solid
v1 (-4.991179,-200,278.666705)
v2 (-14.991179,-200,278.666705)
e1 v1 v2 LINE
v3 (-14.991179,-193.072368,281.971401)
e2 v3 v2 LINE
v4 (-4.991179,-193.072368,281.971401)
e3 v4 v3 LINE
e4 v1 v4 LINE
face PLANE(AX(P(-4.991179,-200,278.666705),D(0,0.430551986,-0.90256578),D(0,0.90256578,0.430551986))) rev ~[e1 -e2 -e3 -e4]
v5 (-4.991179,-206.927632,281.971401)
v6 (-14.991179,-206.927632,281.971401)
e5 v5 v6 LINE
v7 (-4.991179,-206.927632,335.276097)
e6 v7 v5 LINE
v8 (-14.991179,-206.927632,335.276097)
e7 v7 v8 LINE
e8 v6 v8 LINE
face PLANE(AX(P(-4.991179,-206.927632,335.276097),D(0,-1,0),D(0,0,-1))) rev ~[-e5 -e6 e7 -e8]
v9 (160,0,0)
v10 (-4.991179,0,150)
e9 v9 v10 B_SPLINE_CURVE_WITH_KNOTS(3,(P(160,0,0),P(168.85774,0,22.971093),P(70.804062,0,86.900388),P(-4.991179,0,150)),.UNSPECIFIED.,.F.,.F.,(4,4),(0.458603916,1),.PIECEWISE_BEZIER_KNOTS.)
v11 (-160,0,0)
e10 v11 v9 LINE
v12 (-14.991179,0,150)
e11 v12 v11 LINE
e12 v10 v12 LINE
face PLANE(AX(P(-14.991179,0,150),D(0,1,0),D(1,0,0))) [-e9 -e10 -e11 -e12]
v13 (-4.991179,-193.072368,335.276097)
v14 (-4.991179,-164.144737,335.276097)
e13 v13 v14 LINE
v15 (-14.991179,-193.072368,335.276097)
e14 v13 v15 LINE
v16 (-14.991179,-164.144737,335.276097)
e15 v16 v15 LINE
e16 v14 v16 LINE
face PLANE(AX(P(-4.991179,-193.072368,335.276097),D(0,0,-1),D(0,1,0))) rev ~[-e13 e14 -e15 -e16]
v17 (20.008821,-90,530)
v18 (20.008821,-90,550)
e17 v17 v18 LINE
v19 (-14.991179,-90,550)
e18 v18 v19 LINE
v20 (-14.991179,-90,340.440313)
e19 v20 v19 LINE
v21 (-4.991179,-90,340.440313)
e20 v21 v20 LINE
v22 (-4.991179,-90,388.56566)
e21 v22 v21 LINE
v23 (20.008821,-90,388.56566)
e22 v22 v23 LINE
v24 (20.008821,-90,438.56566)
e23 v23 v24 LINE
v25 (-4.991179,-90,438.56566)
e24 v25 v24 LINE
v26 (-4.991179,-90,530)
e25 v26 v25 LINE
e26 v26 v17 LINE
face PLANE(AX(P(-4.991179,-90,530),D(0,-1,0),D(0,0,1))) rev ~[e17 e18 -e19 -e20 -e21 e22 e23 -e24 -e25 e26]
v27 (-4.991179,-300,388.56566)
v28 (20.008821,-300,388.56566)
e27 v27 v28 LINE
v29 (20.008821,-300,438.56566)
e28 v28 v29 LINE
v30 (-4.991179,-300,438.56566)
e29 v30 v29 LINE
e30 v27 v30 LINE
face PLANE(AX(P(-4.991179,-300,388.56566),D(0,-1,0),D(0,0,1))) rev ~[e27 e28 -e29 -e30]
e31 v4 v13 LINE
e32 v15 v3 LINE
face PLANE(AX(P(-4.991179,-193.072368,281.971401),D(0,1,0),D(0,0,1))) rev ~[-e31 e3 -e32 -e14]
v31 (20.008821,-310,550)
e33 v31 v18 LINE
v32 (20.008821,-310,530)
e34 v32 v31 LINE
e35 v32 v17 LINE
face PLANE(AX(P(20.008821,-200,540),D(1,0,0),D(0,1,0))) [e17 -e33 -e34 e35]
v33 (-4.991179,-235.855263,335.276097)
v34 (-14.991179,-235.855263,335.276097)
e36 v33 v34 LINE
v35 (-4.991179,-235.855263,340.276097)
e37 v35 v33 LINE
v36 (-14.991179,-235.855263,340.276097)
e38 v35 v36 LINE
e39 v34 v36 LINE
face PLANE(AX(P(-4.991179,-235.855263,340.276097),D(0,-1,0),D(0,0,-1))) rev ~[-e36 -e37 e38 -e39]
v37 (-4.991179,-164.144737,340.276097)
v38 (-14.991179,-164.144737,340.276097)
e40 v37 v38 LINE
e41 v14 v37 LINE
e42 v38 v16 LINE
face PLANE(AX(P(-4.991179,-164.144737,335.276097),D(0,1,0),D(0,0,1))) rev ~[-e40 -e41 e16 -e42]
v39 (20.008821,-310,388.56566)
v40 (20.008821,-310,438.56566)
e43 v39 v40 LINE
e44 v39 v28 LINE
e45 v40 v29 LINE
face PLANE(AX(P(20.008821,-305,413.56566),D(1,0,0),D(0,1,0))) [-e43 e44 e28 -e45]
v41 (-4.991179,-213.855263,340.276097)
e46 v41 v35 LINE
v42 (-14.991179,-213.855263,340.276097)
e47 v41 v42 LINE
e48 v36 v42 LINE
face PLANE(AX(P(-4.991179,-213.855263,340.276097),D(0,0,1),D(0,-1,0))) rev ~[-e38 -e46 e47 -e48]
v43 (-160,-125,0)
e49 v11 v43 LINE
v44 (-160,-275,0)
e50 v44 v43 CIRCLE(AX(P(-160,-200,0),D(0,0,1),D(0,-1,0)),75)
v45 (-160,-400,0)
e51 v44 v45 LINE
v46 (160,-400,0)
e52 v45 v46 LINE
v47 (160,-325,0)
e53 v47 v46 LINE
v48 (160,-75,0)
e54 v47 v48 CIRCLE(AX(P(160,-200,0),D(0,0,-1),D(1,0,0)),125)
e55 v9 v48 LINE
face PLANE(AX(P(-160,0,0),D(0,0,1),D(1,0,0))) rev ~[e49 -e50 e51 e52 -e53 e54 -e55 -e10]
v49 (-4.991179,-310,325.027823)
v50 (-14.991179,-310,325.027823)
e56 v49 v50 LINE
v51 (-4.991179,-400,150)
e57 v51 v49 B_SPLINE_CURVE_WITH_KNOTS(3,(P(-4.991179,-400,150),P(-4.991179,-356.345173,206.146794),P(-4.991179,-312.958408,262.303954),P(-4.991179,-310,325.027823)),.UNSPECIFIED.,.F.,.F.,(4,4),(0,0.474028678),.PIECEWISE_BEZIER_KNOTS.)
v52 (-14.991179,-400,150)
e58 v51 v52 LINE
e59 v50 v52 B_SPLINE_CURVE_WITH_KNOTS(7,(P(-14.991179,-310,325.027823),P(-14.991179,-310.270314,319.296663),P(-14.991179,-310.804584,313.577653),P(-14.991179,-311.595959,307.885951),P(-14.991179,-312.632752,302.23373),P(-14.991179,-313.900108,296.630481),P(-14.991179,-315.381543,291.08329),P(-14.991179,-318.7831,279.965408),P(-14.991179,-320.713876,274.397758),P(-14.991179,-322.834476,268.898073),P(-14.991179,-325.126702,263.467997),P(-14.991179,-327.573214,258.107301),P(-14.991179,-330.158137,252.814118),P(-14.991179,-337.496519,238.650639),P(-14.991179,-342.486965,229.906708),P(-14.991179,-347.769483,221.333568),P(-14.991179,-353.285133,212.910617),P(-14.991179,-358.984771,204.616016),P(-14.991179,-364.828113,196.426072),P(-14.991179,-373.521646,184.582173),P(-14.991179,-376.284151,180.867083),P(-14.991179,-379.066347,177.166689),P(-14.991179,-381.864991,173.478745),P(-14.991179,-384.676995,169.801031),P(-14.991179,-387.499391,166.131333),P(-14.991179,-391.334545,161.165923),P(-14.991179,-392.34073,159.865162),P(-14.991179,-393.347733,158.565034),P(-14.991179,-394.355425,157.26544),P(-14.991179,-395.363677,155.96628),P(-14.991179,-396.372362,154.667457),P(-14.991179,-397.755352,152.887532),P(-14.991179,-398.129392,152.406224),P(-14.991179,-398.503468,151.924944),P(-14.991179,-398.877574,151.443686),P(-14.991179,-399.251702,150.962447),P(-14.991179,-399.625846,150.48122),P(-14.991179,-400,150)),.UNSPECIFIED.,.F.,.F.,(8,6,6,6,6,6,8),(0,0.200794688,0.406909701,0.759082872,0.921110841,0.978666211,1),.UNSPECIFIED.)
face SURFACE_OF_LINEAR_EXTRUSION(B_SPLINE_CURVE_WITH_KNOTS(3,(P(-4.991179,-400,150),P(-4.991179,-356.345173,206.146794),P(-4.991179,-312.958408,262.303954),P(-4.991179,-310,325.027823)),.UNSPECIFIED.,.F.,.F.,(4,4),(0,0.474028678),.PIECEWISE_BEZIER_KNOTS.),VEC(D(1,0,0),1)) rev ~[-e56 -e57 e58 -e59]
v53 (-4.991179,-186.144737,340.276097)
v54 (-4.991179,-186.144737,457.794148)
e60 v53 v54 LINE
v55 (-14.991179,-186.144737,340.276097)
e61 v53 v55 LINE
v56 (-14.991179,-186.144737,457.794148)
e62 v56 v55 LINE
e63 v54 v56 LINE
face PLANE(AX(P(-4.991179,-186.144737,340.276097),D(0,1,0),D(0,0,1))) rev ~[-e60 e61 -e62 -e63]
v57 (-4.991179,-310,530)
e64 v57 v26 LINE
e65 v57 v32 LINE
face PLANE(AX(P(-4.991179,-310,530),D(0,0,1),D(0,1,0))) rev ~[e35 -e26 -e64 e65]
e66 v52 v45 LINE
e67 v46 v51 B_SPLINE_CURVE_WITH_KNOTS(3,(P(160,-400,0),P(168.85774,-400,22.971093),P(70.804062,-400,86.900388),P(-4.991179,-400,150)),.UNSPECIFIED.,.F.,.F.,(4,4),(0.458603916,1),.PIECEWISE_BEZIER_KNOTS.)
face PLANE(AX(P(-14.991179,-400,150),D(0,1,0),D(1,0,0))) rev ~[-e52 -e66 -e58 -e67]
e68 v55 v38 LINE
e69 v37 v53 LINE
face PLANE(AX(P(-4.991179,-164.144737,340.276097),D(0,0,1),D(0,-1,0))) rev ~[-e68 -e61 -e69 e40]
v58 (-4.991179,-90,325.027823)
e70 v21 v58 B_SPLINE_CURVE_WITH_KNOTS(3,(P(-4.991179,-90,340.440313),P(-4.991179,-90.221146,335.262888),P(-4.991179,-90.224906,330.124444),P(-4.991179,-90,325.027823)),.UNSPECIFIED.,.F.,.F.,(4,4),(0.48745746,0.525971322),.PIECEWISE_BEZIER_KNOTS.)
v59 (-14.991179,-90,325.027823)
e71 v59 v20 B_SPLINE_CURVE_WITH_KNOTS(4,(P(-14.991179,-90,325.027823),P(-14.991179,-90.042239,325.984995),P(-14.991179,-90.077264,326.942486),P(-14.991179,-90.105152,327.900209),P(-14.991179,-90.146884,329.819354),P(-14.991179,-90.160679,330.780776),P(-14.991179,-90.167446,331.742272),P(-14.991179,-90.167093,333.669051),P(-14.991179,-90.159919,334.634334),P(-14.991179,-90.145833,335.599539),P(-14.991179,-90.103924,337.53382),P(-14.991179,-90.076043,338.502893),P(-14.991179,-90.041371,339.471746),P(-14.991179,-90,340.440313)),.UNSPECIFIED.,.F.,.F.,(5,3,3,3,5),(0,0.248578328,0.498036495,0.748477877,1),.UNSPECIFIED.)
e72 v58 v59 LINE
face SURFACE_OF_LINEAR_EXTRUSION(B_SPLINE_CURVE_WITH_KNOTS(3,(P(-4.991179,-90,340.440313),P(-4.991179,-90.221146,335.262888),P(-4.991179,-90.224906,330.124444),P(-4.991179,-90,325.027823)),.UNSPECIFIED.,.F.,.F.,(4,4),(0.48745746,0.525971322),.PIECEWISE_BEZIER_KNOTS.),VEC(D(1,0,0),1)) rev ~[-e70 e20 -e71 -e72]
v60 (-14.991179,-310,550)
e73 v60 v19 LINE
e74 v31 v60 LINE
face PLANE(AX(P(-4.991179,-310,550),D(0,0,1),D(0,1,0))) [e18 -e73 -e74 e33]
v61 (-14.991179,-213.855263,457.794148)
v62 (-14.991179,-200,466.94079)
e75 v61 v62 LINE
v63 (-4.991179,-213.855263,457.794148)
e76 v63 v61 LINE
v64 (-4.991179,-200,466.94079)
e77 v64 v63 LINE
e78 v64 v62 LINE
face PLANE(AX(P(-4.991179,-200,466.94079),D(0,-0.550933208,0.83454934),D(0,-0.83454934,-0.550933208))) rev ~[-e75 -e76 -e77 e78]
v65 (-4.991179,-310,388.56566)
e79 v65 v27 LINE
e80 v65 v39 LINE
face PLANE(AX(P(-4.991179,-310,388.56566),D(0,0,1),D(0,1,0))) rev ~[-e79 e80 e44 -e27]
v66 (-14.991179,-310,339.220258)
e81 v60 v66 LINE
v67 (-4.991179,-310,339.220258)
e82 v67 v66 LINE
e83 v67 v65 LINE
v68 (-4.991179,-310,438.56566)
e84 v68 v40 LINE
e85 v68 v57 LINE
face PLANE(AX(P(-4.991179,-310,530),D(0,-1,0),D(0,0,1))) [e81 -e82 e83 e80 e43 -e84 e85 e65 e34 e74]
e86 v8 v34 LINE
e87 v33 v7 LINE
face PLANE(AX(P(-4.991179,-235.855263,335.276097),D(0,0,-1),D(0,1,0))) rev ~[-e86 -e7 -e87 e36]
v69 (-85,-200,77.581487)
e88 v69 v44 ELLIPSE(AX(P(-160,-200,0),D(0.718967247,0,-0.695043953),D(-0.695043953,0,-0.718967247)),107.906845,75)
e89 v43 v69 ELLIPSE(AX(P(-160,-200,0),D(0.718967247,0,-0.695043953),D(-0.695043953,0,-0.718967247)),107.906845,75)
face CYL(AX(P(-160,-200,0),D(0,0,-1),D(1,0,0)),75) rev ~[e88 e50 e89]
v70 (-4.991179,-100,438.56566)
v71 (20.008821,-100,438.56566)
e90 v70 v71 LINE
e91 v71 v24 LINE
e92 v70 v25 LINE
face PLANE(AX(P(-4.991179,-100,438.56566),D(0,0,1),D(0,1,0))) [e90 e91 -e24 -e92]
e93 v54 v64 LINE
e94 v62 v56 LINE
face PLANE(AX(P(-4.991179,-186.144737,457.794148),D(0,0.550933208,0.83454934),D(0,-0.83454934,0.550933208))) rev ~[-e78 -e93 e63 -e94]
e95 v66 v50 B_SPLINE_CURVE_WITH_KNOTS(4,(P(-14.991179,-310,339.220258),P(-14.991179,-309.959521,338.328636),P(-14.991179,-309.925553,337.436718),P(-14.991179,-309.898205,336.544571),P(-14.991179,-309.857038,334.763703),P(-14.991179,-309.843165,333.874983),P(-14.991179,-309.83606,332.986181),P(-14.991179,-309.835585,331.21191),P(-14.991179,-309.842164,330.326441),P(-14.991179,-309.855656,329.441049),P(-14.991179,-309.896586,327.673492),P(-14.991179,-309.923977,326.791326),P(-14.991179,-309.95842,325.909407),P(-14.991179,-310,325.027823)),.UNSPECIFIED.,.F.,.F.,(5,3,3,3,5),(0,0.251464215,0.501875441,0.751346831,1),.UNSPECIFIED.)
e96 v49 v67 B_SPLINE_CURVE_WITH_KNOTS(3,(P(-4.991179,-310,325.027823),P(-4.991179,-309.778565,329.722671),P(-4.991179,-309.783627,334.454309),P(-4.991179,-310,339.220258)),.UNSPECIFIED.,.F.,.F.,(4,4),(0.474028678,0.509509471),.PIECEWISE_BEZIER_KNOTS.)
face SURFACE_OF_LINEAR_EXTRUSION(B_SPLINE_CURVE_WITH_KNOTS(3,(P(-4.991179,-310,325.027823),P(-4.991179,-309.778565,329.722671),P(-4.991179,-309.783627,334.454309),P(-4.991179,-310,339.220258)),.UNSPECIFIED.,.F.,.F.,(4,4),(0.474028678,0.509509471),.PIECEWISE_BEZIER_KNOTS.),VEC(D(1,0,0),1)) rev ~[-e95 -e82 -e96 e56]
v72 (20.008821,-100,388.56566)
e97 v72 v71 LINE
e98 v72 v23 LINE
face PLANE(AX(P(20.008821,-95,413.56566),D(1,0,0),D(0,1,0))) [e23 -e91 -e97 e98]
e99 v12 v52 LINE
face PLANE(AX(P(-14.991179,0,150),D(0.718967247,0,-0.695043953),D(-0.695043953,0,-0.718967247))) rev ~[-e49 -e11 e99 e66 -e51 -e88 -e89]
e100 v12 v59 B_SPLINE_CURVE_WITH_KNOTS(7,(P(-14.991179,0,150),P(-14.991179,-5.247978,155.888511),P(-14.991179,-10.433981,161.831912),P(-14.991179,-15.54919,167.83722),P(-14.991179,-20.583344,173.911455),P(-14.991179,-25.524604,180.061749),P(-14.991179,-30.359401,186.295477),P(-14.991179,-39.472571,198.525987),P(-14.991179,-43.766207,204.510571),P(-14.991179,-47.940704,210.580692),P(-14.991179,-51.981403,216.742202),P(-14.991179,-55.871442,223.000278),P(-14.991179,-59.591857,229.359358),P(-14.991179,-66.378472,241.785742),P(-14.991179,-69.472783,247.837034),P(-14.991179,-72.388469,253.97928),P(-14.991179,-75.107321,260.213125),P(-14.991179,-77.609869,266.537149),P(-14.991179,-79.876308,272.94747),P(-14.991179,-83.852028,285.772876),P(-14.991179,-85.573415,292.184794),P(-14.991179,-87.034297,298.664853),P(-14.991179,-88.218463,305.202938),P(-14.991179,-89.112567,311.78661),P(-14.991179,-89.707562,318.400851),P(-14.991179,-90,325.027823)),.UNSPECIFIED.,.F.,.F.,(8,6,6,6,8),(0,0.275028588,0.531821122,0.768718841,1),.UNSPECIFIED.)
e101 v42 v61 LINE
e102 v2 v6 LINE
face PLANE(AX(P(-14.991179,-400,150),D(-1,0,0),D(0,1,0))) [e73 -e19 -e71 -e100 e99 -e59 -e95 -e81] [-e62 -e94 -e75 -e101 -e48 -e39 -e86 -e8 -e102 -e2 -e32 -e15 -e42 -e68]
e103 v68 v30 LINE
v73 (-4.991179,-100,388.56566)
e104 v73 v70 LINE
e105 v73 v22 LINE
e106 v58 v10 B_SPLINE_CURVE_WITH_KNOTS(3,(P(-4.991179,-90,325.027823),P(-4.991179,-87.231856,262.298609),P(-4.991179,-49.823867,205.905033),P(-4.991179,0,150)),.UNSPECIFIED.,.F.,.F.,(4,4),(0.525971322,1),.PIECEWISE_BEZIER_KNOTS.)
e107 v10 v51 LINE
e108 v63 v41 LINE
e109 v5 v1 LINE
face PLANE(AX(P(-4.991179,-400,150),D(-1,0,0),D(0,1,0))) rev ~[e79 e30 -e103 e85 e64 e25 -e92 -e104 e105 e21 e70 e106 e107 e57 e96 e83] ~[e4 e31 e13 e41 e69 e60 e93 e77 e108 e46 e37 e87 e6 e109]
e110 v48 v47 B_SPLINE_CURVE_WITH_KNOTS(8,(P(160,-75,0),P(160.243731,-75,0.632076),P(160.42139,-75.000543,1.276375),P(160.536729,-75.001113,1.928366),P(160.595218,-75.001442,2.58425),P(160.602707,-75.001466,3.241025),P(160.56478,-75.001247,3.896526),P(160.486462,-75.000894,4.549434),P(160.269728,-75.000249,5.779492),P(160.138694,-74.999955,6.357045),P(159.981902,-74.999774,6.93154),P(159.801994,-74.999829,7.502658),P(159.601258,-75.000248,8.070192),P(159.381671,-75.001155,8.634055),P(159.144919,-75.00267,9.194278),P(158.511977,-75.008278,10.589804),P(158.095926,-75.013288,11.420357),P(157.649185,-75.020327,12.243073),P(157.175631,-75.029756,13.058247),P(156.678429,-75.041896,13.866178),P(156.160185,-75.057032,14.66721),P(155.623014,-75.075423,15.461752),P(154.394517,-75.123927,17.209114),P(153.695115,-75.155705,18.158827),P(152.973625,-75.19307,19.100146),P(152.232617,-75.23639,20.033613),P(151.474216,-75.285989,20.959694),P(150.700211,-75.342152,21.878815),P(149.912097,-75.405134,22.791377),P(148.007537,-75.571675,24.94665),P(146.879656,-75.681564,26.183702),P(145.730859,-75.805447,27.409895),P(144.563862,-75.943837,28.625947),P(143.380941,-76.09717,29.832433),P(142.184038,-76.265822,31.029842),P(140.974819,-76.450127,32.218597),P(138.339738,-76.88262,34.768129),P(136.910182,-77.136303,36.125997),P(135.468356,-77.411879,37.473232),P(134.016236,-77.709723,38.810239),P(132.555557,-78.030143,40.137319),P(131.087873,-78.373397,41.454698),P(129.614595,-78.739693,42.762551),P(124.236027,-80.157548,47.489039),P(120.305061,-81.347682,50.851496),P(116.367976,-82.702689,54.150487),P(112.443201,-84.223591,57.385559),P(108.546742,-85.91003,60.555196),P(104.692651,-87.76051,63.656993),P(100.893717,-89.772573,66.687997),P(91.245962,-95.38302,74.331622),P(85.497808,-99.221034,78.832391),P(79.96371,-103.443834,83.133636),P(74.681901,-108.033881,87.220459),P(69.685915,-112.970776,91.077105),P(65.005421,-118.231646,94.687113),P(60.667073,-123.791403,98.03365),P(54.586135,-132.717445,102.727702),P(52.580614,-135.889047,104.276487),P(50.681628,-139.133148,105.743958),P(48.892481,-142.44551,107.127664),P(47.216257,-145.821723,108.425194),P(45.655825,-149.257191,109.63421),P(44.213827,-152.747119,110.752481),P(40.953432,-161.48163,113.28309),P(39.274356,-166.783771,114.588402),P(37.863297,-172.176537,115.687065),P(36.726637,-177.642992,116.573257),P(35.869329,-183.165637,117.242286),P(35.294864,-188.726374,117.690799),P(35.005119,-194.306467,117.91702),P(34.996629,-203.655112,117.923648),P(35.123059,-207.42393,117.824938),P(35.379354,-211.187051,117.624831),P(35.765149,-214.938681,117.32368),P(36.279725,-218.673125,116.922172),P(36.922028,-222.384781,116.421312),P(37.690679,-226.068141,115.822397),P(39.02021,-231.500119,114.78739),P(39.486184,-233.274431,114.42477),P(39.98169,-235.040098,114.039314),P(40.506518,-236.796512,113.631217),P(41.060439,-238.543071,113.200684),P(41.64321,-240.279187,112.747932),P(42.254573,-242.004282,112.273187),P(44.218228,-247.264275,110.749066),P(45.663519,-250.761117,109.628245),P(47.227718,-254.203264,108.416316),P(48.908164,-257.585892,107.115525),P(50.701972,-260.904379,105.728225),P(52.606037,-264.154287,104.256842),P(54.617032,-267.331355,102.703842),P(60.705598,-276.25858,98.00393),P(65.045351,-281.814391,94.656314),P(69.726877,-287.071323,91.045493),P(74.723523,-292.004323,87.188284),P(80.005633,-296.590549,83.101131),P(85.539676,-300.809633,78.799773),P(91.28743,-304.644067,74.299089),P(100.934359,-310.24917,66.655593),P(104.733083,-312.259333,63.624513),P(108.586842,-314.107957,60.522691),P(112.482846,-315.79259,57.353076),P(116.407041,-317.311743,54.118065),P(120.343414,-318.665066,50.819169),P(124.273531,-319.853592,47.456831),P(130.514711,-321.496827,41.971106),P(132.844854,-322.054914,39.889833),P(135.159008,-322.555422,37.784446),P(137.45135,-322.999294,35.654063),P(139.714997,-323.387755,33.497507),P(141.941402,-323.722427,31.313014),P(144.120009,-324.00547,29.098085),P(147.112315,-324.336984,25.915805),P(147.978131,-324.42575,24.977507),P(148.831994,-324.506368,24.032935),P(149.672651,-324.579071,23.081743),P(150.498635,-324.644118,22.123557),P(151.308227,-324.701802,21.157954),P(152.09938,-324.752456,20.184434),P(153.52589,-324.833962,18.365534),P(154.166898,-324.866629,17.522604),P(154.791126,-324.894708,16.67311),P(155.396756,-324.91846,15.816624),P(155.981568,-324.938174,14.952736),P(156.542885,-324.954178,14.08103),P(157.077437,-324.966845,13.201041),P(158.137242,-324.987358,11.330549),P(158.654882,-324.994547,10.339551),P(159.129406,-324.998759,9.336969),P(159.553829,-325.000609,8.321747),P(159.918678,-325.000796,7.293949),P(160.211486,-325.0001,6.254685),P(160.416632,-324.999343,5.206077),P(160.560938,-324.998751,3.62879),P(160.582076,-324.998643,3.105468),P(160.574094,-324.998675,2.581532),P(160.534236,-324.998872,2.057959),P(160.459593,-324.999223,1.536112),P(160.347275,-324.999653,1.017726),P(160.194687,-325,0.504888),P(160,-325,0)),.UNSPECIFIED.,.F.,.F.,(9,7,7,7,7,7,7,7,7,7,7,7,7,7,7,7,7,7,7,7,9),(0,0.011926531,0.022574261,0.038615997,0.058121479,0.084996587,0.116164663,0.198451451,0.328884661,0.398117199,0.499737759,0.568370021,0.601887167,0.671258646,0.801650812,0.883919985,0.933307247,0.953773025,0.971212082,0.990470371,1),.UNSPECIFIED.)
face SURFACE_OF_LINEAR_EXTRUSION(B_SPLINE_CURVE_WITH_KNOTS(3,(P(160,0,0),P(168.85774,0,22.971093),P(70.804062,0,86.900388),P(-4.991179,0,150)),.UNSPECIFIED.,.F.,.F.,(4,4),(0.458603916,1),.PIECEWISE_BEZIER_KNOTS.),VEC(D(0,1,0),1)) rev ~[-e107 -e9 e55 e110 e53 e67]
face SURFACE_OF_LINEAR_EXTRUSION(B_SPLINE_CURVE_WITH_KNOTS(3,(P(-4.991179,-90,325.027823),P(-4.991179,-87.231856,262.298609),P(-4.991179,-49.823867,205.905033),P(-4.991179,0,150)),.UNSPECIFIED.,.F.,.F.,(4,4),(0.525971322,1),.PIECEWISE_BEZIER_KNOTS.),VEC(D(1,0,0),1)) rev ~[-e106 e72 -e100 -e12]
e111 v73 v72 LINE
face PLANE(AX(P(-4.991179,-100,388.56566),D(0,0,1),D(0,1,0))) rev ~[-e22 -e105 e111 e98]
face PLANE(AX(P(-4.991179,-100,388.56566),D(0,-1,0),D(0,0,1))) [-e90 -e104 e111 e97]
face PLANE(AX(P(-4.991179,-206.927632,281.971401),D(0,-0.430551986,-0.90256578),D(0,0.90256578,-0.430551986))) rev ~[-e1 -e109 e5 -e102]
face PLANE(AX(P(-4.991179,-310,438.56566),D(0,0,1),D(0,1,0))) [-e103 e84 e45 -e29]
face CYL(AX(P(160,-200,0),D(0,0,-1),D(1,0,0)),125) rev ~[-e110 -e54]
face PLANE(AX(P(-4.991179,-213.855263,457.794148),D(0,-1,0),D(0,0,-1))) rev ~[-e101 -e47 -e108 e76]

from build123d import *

# Parameters (mm, degrees)
F1_DEPTH  = 400
F2_R      = 75
F2_R_2    = 125
F3_DEPTH  = 160
F4_W      = 10
F4_H      = 400
F5_DEPTH  = 400
F7_DEPTH  = 369
F8_DEPTH  = 744
F9_DEPTH  = 294
F10_DEPTH = 25
F11_W     = 220
F11_H     = 20
F12_DEPTH = 25
F13_W     = 10
F13_H     = 50
F14_DEPTH = 25


with BuildPart() as f1:
    # F0 (on Front) → F1 (new body)
    with BuildSketch(Plane.XZ):
        with BuildLine():
            Line((-10, 0), (0, 0))
            Line((0, 0), (160, 0))
            add(Edge.make_bspline(
                [(160, 0), (168.8577404315, 22.9710926099), (70.8040622396, 86.9003880522), (-4.9911788106, 150)],
                knots=[0.4586039165, 0.4586039165, 0.4586039165, 0.4586039165, 1, 1, 1, 1], degree=3))
            Line((-4.9911788106, 150), (-14.9911788106, 150))
            Line((-14.9911788106, 150), (-160, 0))
            Line((-160, 0), (-60, 0))
            Line((-60, 0), (-10, 0))
        make_face()
    extrude(amount=F1_DEPTH)

    # F2 (on face) → F3 (cut)
    with BuildSketch(Plane(origin=(0, 0, 0), x_dir=(1, 0, 0), z_dir=(0, 0, -1))):
        with Locations((-160, 200)):
            Circle(F2_R)
        with Locations((160, 200)):
            Circle(F2_R_2)
    extrude(amount=-F3_DEPTH, mode=Mode.SUBTRACT)

    # F4 (on face) → F5 (join)
    with BuildSketch(Plane.XY.offset(150)):
        with Locations((-9.9911788106, -200)):
            Rectangle(F4_W, F4_H)
    extrude(amount=F5_DEPTH)

    # F6 (on face) → F7 (cut)
    with BuildSketch(Plane.YZ.offset(-4.9911788106)):
        with BuildLine():
            Line((-400, 550), (-400, 150))
            add(Edge.make_bspline(
                [(-400, 150), (-356.3451728041, 206.1467944777), (-312.9584078924, 262.3039541318), (-310, 325.0278234482)],
                knots=[0, 0, 0, 0, 0.4740286783, 0.4740286783, 0.4740286783, 0.4740286783], degree=3))
            Line((-310, 325.0278234482), (-310, 339.2202581751))
            add(Edge.make_bspline(
                [(-310, 339.2202581751), (-312.9911644459, 405.1052836748), (-356.3650932552, 477.5474537124), (-400, 550)],
                knots=[0.5095094707, 0.5095094707, 0.5095094707, 0.5095094707, 1, 1, 1, 1], degree=3))
        make_face()
        with BuildLine():
            Line((0, 550), (-90, 550))
            Line((-90, 550), (-90, 530))
            Line((-90, 530), (-90, 340.4403127563))
            add(Edge.make_bspline(
                [(0, 550), (-49.5785227153, 477.7428221558), (-87.2010209493, 405.969304948), (-90, 340.4403127563)],
                knots=[0, 0, 0, 0, 0.4874574601, 0.4874574601, 0.4874574601, 0.4874574601], degree=3))
        make_face()
        with BuildLine():
            Line((-310, 339.2202581751), (-310, 325.0278234482))
            add(Edge.make_bspline(
                [(-310, 325.0278234482), (-309.7785647553, 329.7226714383), (-309.7836270458, 334.4543090401), (-310, 339.2202581751)],
                knots=[0.4740286783, 0.4740286783, 0.4740286783, 0.4740286783, 0.5095094707, 0.5095094707, 0.5095094707, 0.5095094707], degree=3))
        make_face()
        with BuildLine():
            Line((-310, 550), (-400, 550))
            add(Edge.make_bspline(
                [(-310, 339.2202581751), (-312.9911644459, 405.1052836748), (-356.3650932552, 477.5474537124), (-400, 550)],
                knots=[0.5095094707, 0.5095094707, 0.5095094707, 0.5095094707, 1, 1, 1, 1], degree=3))
            Line((-310, 339.2202581751), (-310, 530))
            Line((-310, 530), (-310, 550))
        make_face()
        with BuildLine():
            Line((0, 150), (0, 550))
            add(Edge.make_bspline(
                [(0, 550), (-49.5785227153, 477.7428221558), (-87.2010209493, 405.969304948), (-90, 340.4403127563)],
                knots=[0, 0, 0, 0, 0.4874574601, 0.4874574601, 0.4874574601, 0.4874574601], degree=3))
            Line((-90, 340.4403127563), (-90, 325.0278234482))
            add(Edge.make_bspline(
                [(-90, 325.0278234482), (-87.2318561535, 262.2986085933), (-49.8238669759, 205.9050330021), (0, 150)],
                knots=[0.5259713217, 0.5259713217, 0.5259713217, 0.5259713217, 1, 1, 1, 1], degree=3))
        make_face()
        with BuildLine():
            Line((-90, 325.0278234482), (-90, 340.4403127563))
            add(Edge.make_bspline(
                [(-90, 340.4403127563), (-90.2211464603, 335.2628875556), (-90.224906032, 330.1244439943), (-90, 325.0278234482)],
                knots=[0.4874574601, 0.4874574601, 0.4874574601, 0.4874574601, 0.5259713217, 0.5259713217, 0.5259713217, 0.5259713217], degree=3))
        make_face()
        Polygon((-186.1447365284, 340.2760970592), (-186.1447365284, 457.7941475637), (-200, 466.9407904148), (-213.8552634716, 457.7941475637), (-213.8552634716, 340.2760970592), (-225.8552634716, 340.2760970592), (-235.8552634716, 340.2760970592), (-235.8552634716, 335.2760970592), (-213.8552634716, 335.2760970592), (-206.9276317358, 335.2760970592), (-206.9276317358, 281.9714009762), (-200, 278.6667048931), (-193.0723682642, 281.9714009762), (-193.0723682642, 335.2760970592), (-186.1447365284, 335.2760970592), (-164.1447365284, 335.2760970592), (-164.1447365284, 340.2760970592), (-174.1447365284, 340.2760970592), align=None)
    extrude(amount=-F7_DEPTH, mode=Mode.SUBTRACT)

    # F6 (on face) → F8 (cut)
    with BuildSketch(Plane.YZ.offset(-4.9911788106)):
        with BuildLine():
            Line((-400, 550), (-400, 150))
            add(Edge.make_bspline(
                [(-400, 150), (-356.3451728041, 206.1467944777), (-312.9584078924, 262.3039541318), (-310, 325.0278234482)],
                knots=[0, 0, 0, 0, 0.4740286783, 0.4740286783, 0.4740286783, 0.4740286783], degree=3))
            Line((-310, 325.0278234482), (-310, 339.2202581751))
            add(Edge.make_bspline(
                [(-310, 339.2202581751), (-312.9911644459, 405.1052836748), (-356.3650932552, 477.5474537124), (-400, 550)],
                knots=[0.5095094707, 0.5095094707, 0.5095094707, 0.5095094707, 1, 1, 1, 1], degree=3))
        make_face()
        with BuildLine():
            Line((0, 550), (-90, 550))
            Line((-90, 550), (-90, 530))
            Line((-90, 530), (-90, 340.4403127563))
            add(Edge.make_bspline(
                [(0, 550), (-49.5785227153, 477.7428221558), (-87.2010209493, 405.969304948), (-90, 340.4403127563)],
                knots=[0, 0, 0, 0, 0.4874574601, 0.4874574601, 0.4874574601, 0.4874574601], degree=3))
        make_face()
        with BuildLine():
            Line((-310, 339.2202581751), (-310, 325.0278234482))
            add(Edge.make_bspline(
                [(-310, 325.0278234482), (-309.7785647553, 329.7226714383), (-309.7836270458, 334.4543090401), (-310, 339.2202581751)],
                knots=[0.4740286783, 0.4740286783, 0.4740286783, 0.4740286783, 0.5095094707, 0.5095094707, 0.5095094707, 0.5095094707], degree=3))
        make_face()
        with BuildLine():
            Line((-310, 550), (-400, 550))
            add(Edge.make_bspline(
                [(-310, 339.2202581751), (-312.9911644459, 405.1052836748), (-356.3650932552, 477.5474537124), (-400, 550)],
                knots=[0.5095094707, 0.5095094707, 0.5095094707, 0.5095094707, 1, 1, 1, 1], degree=3))
            Line((-310, 339.2202581751), (-310, 530))
            Line((-310, 530), (-310, 550))
        make_face()
        with BuildLine():
            Line((0, 150), (0, 550))
            add(Edge.make_bspline(
                [(0, 550), (-49.5785227153, 477.7428221558), (-87.2010209493, 405.969304948), (-90, 340.4403127563)],
                knots=[0, 0, 0, 0, 0.4874574601, 0.4874574601, 0.4874574601, 0.4874574601], degree=3))
            Line((-90, 340.4403127563), (-90, 325.0278234482))
            add(Edge.make_bspline(
                [(-90, 325.0278234482), (-87.2318561535, 262.2986085933), (-49.8238669759, 205.9050330021), (0, 150)],
                knots=[0.5259713217, 0.5259713217, 0.5259713217, 0.5259713217, 1, 1, 1, 1], degree=3))
        make_face()
        with BuildLine():
            Line((-90, 325.0278234482), (-90, 340.4403127563))
            add(Edge.make_bspline(
                [(-90, 340.4403127563), (-90.2211464603, 335.2628875556), (-90.224906032, 330.1244439943), (-90, 325.0278234482)],
                knots=[0.4874574601, 0.4874574601, 0.4874574601, 0.4874574601, 0.5259713217, 0.5259713217, 0.5259713217, 0.5259713217], degree=3))
        make_face()
        Polygon((-186.1447365284, 340.2760970592), (-186.1447365284, 457.7941475637), (-200, 466.9407904148), (-213.8552634716, 457.7941475637), (-213.8552634716, 340.2760970592), (-225.8552634716, 340.2760970592), (-235.8552634716, 340.2760970592), (-235.8552634716, 335.2760970592), (-213.8552634716, 335.2760970592), (-206.9276317358, 335.2760970592), (-206.9276317358, 281.9714009762), (-200, 278.6667048931), (-193.0723682642, 281.9714009762), (-193.0723682642, 335.2760970592), (-186.1447365284, 335.2760970592), (-164.1447365284, 335.2760970592), (-164.1447365284, 340.2760970592), (-174.1447365284, 340.2760970592), align=None)
    extrude(amount=-F8_DEPTH, mode=Mode.SUBTRACT)

    # F6 (on face) → F9 (cut)
    with BuildSketch(Plane.YZ.offset(-4.9911788106)):
        with BuildLine():
            Line((-400, 550), (-400, 150))
            add(Edge.make_bspline(
                [(-400, 150), (-356.3451728041, 206.1467944777), (-312.9584078924, 262.3039541318), (-310, 325.0278234482)],
                knots=[0, 0, 0, 0, 0.4740286783, 0.4740286783, 0.4740286783, 0.4740286783], degree=3))
            Line((-310, 325.0278234482), (-310, 339.2202581751))
            add(Edge.make_bspline(
                [(-310, 339.2202581751), (-312.9911644459, 405.1052836748), (-356.3650932552, 477.5474537124), (-400, 550)],
                knots=[0.5095094707, 0.5095094707, 0.5095094707, 0.5095094707, 1, 1, 1, 1], degree=3))
        make_face()
        with BuildLine():
            Line((0, 550), (-90, 550))
            Line((-90, 550), (-90, 530))
            Line((-90, 530), (-90, 340.4403127563))
            add(Edge.make_bspline(
                [(0, 550), (-49.5785227153, 477.7428221558), (-87.2010209493, 405.969304948), (-90, 340.4403127563)],
                knots=[0, 0, 0, 0, 0.4874574601, 0.4874574601, 0.4874574601, 0.4874574601], degree=3))
        make_face()
        with BuildLine():
            Line((-310, 339.2202581751), (-310, 325.0278234482))
            add(Edge.make_bspline(
                [(-310, 325.0278234482), (-309.7785647553, 329.7226714383), (-309.7836270458, 334.4543090401), (-310, 339.2202581751)],
                knots=[0.4740286783, 0.4740286783, 0.4740286783, 0.4740286783, 0.5095094707, 0.5095094707, 0.5095094707, 0.5095094707], degree=3))
        make_face()
        with BuildLine():
            Line((-310, 550), (-400, 550))
            add(Edge.make_bspline(
                [(-310, 339.2202581751), (-312.9911644459, 405.1052836748), (-356.3650932552, 477.5474537124), (-400, 550)],
                knots=[0.5095094707, 0.5095094707, 0.5095094707, 0.5095094707, 1, 1, 1, 1], degree=3))
            Line((-310, 339.2202581751), (-310, 530))
            Line((-310, 530), (-310, 550))
        make_face()
        with BuildLine():
            Line((0, 150), (0, 550))
            add(Edge.make_bspline(
                [(0, 550), (-49.5785227153, 477.7428221558), (-87.2010209493, 405.969304948), (-90, 340.4403127563)],
                knots=[0, 0, 0, 0, 0.4874574601, 0.4874574601, 0.4874574601, 0.4874574601], degree=3))
            Line((-90, 340.4403127563), (-90, 325.0278234482))
            add(Edge.make_bspline(
                [(-90, 325.0278234482), (-87.2318561535, 262.2986085933), (-49.8238669759, 205.9050330021), (0, 150)],
                knots=[0.5259713217, 0.5259713217, 0.5259713217, 0.5259713217, 1, 1, 1, 1], degree=3))
        make_face()
        with BuildLine():
            Line((-90, 325.0278234482), (-90, 340.4403127563))
            add(Edge.make_bspline(
                [(-90, 340.4403127563), (-90.2211464603, 335.2628875556), (-90.224906032, 330.1244439943), (-90, 325.0278234482)],
                knots=[0.4874574601, 0.4874574601, 0.4874574601, 0.4874574601, 0.5259713217, 0.5259713217, 0.5259713217, 0.5259713217], degree=3))
        make_face()
        Polygon((-186.1447365284, 340.2760970592), (-186.1447365284, 457.7941475637), (-200, 466.9407904148), (-213.8552634716, 457.7941475637), (-213.8552634716, 340.2760970592), (-225.8552634716, 340.2760970592), (-235.8552634716, 340.2760970592), (-235.8552634716, 335.2760970592), (-213.8552634716, 335.2760970592), (-206.9276317358, 335.2760970592), (-206.9276317358, 281.9714009762), (-200, 278.6667048931), (-193.0723682642, 281.9714009762), (-193.0723682642, 335.2760970592), (-186.1447365284, 335.2760970592), (-164.1447365284, 335.2760970592), (-164.1447365284, 340.2760970592), (-174.1447365284, 340.2760970592), align=None)
    extrude(amount=-F9_DEPTH, mode=Mode.SUBTRACT)

    # F6 (on face) → F10 (cut)
    with BuildSketch(Plane.YZ.offset(-4.9911788106)):
        with BuildLine():
            Line((-400, 550), (-400, 150))
            add(Edge.make_bspline(
                [(-400, 150), (-356.3451728041, 206.1467944777), (-312.9584078924, 262.3039541318), (-310, 325.0278234482)],
                knots=[0, 0, 0, 0, 0.4740286783, 0.4740286783, 0.4740286783, 0.4740286783], degree=3))
            Line((-310, 325.0278234482), (-310, 339.2202581751))
            add(Edge.make_bspline(
                [(-310, 339.2202581751), (-312.9911644459, 405.1052836748), (-356.3650932552, 477.5474537124), (-400, 550)],
                knots=[0.5095094707, 0.5095094707, 0.5095094707, 0.5095094707, 1, 1, 1, 1], degree=3))
        make_face()
        with BuildLine():
            Line((0, 550), (-90, 550))
            Line((-90, 550), (-90, 530))
            Line((-90, 530), (-90, 340.4403127563))
            add(Edge.make_bspline(
                [(0, 550), (-49.5785227153, 477.7428221558), (-87.2010209493, 405.969304948), (-90, 340.4403127563)],
                knots=[0, 0, 0, 0, 0.4874574601, 0.4874574601, 0.4874574601, 0.4874574601], degree=3))
        make_face()
        with BuildLine():
            Line((-310, 339.2202581751), (-310, 325.0278234482))
            add(Edge.make_bspline(
                [(-310, 325.0278234482), (-309.7785647553, 329.7226714383), (-309.7836270458, 334.4543090401), (-310, 339.2202581751)],
                knots=[0.4740286783, 0.4740286783, 0.4740286783, 0.4740286783, 0.5095094707, 0.5095094707, 0.5095094707, 0.5095094707], degree=3))
        make_face()
        with BuildLine():
            Line((-310, 550), (-400, 550))
            add(Edge.make_bspline(
                [(-310, 339.2202581751), (-312.9911644459, 405.1052836748), (-356.3650932552, 477.5474537124), (-400, 550)],
                knots=[0.5095094707, 0.5095094707, 0.5095094707, 0.5095094707, 1, 1, 1, 1], degree=3))
            Line((-310, 339.2202581751), (-310, 530))
            Line((-310, 530), (-310, 550))
        make_face()
        with BuildLine():
            Line((0, 150), (0, 550))
            add(Edge.make_bspline(
                [(0, 550), (-49.5785227153, 477.7428221558), (-87.2010209493, 405.969304948), (-90, 340.4403127563)],
                knots=[0, 0, 0, 0, 0.4874574601, 0.4874574601, 0.4874574601, 0.4874574601], degree=3))
            Line((-90, 340.4403127563), (-90, 325.0278234482))
            add(Edge.make_bspline(
                [(-90, 325.0278234482), (-87.2318561535, 262.2986085933), (-49.8238669759, 205.9050330021), (0, 150)],
                knots=[0.5259713217, 0.5259713217, 0.5259713217, 0.5259713217, 1, 1, 1, 1], degree=3))
        make_face()
        with BuildLine():
            Line((-90, 325.0278234482), (-90, 340.4403127563))
            add(Edge.make_bspline(
                [(-90, 340.4403127563), (-90.2211464603, 335.2628875556), (-90.224906032, 330.1244439943), (-90, 325.0278234482)],
                knots=[0.4874574601, 0.4874574601, 0.4874574601, 0.4874574601, 0.5259713217, 0.5259713217, 0.5259713217, 0.5259713217], degree=3))
        make_face()
        Polygon((-186.1447365284, 340.2760970592), (-186.1447365284, 457.7941475637), (-200, 466.9407904148), (-213.8552634716, 457.7941475637), (-213.8552634716, 340.2760970592), (-225.8552634716, 340.2760970592), (-235.8552634716, 340.2760970592), (-235.8552634716, 335.2760970592), (-213.8552634716, 335.2760970592), (-206.9276317358, 335.2760970592), (-206.9276317358, 281.9714009762), (-200, 278.6667048931), (-193.0723682642, 281.9714009762), (-193.0723682642, 335.2760970592), (-186.1447365284, 335.2760970592), (-164.1447365284, 335.2760970592), (-164.1447365284, 340.2760970592), (-174.1447365284, 340.2760970592), align=None)
    extrude(amount=-F10_DEPTH, mode=Mode.SUBTRACT)

    # F11 (on face) → F12 (join)
    with BuildSketch(Plane.YZ.offset(-4.9911788106)):
        with Locations((-200, 540)):
            Rectangle(F11_W, F11_H)
    extrude(amount=F12_DEPTH)

    # F13 (on face) → F14 (join)
    with BuildSketch(Plane.YZ.offset(-4.9911788106)):
        with Locations((-305, 413.565659523)):
            Rectangle(F13_W, F13_H)
        with Locations((-95, 413.565659523)):
            Rectangle(F13_W, F13_H)
    extrude(amount=F14_DEPTH)


solid = f1.part
